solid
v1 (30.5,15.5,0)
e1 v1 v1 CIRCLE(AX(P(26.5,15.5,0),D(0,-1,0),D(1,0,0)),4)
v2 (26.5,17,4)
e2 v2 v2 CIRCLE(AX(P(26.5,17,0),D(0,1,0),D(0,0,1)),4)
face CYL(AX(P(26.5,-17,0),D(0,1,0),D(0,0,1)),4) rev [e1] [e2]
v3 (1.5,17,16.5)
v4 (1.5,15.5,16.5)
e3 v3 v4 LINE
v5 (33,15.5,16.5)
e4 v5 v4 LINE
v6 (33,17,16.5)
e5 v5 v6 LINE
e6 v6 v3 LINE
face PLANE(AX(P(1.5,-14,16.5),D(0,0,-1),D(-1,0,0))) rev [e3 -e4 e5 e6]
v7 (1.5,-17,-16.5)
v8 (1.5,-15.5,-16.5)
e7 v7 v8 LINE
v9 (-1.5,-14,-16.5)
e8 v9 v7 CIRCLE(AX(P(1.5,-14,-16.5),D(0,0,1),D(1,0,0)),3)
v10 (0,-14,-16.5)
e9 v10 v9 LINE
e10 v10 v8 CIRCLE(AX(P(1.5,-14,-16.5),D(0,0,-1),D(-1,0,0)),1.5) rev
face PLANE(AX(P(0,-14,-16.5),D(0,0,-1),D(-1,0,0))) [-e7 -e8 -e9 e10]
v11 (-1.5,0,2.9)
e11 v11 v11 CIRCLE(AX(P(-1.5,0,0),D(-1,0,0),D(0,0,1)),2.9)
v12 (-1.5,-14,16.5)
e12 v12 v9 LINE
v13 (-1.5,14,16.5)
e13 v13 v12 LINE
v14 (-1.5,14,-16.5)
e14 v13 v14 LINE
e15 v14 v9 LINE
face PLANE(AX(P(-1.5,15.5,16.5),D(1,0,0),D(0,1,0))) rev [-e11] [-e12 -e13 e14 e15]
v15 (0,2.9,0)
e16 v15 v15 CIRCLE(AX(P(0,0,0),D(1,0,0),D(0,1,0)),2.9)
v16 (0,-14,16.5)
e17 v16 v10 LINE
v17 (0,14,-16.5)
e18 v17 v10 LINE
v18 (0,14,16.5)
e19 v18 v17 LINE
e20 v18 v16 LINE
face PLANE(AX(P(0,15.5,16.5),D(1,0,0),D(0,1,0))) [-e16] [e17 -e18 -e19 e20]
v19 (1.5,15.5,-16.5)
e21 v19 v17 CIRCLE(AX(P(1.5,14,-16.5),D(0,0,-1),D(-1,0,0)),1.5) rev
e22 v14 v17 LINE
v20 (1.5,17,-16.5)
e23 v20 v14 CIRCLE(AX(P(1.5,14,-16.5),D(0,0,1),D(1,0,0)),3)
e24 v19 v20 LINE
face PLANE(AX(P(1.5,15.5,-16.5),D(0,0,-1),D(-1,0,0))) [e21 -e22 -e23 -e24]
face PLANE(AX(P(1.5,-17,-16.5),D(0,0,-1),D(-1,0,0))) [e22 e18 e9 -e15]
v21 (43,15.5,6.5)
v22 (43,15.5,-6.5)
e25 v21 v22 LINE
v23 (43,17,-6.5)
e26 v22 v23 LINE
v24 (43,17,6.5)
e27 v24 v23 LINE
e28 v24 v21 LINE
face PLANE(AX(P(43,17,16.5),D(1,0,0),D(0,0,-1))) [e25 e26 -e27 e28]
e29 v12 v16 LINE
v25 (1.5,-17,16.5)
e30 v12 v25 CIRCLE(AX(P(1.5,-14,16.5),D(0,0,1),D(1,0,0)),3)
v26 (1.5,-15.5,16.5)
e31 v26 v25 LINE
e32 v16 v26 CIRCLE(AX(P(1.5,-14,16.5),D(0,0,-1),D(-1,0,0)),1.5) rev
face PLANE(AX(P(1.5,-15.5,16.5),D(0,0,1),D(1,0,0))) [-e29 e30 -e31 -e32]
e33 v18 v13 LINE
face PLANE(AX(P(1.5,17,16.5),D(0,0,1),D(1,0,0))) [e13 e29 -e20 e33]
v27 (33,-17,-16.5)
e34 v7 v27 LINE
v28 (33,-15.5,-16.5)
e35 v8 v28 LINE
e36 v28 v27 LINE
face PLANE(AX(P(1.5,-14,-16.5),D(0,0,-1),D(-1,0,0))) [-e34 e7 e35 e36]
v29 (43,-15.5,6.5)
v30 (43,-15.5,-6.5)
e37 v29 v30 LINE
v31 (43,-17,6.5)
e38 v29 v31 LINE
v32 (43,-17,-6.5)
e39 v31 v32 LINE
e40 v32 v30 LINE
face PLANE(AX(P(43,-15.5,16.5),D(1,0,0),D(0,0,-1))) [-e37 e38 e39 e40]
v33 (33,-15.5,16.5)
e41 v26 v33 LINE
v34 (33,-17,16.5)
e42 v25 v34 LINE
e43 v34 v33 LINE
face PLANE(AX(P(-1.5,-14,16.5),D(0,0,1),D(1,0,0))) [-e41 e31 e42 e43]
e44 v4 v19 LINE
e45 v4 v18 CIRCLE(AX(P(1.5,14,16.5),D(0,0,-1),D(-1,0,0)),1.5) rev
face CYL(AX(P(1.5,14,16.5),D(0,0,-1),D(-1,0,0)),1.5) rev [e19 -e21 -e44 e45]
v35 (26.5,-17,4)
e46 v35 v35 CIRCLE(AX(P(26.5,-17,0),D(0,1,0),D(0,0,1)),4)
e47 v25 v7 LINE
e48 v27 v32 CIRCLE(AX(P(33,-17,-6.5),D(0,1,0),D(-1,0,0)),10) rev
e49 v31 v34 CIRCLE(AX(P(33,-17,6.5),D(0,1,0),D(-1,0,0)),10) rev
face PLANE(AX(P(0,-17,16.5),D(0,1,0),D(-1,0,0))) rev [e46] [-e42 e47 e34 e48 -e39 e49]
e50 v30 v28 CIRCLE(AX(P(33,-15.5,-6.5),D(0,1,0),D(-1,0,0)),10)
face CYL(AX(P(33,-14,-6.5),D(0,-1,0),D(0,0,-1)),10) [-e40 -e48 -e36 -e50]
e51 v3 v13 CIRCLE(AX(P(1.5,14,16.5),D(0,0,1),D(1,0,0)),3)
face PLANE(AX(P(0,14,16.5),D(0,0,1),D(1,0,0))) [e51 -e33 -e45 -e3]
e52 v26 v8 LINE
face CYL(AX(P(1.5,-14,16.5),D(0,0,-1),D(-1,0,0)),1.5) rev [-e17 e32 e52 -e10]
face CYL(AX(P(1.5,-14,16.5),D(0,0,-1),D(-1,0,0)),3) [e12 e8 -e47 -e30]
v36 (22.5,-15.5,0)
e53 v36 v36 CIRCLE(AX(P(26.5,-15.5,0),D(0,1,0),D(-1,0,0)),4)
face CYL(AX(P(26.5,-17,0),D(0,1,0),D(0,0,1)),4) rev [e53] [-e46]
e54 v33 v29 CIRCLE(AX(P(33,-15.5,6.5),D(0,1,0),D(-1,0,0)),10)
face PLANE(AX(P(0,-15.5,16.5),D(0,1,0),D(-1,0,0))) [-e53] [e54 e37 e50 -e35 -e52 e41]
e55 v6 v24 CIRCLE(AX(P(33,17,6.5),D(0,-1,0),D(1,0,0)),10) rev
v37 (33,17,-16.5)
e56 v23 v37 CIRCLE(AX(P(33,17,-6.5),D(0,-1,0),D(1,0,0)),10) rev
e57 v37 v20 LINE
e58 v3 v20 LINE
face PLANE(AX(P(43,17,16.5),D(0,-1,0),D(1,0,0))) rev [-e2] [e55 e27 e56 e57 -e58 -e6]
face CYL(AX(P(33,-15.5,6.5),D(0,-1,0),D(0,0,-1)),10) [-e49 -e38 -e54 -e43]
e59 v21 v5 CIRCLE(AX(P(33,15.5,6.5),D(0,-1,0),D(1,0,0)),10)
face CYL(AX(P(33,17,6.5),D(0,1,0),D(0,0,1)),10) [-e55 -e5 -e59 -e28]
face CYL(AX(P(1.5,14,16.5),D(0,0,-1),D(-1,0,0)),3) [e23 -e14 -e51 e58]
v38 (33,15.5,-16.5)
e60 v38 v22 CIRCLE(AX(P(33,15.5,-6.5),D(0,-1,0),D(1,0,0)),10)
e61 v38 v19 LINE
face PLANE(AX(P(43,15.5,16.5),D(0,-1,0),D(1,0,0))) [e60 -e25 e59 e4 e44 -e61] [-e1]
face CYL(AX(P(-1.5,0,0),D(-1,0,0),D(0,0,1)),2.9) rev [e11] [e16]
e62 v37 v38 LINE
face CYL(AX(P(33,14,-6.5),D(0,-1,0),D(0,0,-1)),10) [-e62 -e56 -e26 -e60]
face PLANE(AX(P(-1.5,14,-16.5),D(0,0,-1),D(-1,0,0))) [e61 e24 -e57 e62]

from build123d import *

# Parameters (mm, degrees)
BASE_FLANGE1_DEPTH   = 16.5
SKETCH6_R            = 4
CUT_EXTRUDE1_DEPTH   = 58.247270677
M5_CLEARANCE_HOLE1_D = 5.8
FILLET1_R            = 10


# Sheet-metal steps are written as plain solids
with BuildPart() as part:
    # Sketch1 → Base-Flange1 (new, symmetric)
    with BuildSketch(Plane.XY):
        with BuildLine():
            Line((43, 15.5), (1.5, 15.5))
            ThreePointArc((1.5, 15.5), (0.439339828, 15.060660172), (0, 14))
            Line((0, 14), (0, -14))
            ThreePointArc((0, -14), (0.439339828, -15.060660172), (1.5, -15.5))
            Line((1.5, -15.5), (43, -15.5))
            Line((43, -15.5), (43, -17))
            Line((43, -17), (1.5, -17))
            ThreePointArc((1.5, -17), (-0.621320344, -16.121320344), (-1.5, -14))
            Line((-1.5, -14), (-1.5, 14))
            ThreePointArc((-1.5, 14), (-0.621320344, 16.121320344), (1.5, 17))
            Line((1.5, 17), (43, 17))
            Line((43, 17), (43, 15.5))
        make_face()
    extrude(amount=BASE_FLANGE1_DEPTH, both=True)

    # Sketch6 → Cut-Extrude1 (cut, through all)
    with BuildSketch(Plane(origin=(0, 17, 0), x_dir=(1, 0, 0), z_dir=(0, 1, 0))):
        with Locations(Location((26.5, 0, 0), (0, 0, 270))):
            Circle(SKETCH6_R)
    extrude(amount=-CUT_EXTRUDE1_DEPTH, mode=Mode.SUBTRACT)

    # M5 Clearance Hole1 (through all)
    with Locations(Plane.ZY.offset(1.5)):
        with Locations((0, 0)):
            Hole(M5_CLEARANCE_HOLE1_D / 2)

    # Fillet1
    fillet1_edges = [part.edges().sort_by_distance(p)[0] for p in [
        (43, 16.25, -16.5),
        (43, -16.25, -16.5),
        (43, 16.25, 16.5),
        (43, -16.25, 16.5),
    ]]
    fillet(fillet1_edges, radius=FILLET1_R)


solid = part.part
